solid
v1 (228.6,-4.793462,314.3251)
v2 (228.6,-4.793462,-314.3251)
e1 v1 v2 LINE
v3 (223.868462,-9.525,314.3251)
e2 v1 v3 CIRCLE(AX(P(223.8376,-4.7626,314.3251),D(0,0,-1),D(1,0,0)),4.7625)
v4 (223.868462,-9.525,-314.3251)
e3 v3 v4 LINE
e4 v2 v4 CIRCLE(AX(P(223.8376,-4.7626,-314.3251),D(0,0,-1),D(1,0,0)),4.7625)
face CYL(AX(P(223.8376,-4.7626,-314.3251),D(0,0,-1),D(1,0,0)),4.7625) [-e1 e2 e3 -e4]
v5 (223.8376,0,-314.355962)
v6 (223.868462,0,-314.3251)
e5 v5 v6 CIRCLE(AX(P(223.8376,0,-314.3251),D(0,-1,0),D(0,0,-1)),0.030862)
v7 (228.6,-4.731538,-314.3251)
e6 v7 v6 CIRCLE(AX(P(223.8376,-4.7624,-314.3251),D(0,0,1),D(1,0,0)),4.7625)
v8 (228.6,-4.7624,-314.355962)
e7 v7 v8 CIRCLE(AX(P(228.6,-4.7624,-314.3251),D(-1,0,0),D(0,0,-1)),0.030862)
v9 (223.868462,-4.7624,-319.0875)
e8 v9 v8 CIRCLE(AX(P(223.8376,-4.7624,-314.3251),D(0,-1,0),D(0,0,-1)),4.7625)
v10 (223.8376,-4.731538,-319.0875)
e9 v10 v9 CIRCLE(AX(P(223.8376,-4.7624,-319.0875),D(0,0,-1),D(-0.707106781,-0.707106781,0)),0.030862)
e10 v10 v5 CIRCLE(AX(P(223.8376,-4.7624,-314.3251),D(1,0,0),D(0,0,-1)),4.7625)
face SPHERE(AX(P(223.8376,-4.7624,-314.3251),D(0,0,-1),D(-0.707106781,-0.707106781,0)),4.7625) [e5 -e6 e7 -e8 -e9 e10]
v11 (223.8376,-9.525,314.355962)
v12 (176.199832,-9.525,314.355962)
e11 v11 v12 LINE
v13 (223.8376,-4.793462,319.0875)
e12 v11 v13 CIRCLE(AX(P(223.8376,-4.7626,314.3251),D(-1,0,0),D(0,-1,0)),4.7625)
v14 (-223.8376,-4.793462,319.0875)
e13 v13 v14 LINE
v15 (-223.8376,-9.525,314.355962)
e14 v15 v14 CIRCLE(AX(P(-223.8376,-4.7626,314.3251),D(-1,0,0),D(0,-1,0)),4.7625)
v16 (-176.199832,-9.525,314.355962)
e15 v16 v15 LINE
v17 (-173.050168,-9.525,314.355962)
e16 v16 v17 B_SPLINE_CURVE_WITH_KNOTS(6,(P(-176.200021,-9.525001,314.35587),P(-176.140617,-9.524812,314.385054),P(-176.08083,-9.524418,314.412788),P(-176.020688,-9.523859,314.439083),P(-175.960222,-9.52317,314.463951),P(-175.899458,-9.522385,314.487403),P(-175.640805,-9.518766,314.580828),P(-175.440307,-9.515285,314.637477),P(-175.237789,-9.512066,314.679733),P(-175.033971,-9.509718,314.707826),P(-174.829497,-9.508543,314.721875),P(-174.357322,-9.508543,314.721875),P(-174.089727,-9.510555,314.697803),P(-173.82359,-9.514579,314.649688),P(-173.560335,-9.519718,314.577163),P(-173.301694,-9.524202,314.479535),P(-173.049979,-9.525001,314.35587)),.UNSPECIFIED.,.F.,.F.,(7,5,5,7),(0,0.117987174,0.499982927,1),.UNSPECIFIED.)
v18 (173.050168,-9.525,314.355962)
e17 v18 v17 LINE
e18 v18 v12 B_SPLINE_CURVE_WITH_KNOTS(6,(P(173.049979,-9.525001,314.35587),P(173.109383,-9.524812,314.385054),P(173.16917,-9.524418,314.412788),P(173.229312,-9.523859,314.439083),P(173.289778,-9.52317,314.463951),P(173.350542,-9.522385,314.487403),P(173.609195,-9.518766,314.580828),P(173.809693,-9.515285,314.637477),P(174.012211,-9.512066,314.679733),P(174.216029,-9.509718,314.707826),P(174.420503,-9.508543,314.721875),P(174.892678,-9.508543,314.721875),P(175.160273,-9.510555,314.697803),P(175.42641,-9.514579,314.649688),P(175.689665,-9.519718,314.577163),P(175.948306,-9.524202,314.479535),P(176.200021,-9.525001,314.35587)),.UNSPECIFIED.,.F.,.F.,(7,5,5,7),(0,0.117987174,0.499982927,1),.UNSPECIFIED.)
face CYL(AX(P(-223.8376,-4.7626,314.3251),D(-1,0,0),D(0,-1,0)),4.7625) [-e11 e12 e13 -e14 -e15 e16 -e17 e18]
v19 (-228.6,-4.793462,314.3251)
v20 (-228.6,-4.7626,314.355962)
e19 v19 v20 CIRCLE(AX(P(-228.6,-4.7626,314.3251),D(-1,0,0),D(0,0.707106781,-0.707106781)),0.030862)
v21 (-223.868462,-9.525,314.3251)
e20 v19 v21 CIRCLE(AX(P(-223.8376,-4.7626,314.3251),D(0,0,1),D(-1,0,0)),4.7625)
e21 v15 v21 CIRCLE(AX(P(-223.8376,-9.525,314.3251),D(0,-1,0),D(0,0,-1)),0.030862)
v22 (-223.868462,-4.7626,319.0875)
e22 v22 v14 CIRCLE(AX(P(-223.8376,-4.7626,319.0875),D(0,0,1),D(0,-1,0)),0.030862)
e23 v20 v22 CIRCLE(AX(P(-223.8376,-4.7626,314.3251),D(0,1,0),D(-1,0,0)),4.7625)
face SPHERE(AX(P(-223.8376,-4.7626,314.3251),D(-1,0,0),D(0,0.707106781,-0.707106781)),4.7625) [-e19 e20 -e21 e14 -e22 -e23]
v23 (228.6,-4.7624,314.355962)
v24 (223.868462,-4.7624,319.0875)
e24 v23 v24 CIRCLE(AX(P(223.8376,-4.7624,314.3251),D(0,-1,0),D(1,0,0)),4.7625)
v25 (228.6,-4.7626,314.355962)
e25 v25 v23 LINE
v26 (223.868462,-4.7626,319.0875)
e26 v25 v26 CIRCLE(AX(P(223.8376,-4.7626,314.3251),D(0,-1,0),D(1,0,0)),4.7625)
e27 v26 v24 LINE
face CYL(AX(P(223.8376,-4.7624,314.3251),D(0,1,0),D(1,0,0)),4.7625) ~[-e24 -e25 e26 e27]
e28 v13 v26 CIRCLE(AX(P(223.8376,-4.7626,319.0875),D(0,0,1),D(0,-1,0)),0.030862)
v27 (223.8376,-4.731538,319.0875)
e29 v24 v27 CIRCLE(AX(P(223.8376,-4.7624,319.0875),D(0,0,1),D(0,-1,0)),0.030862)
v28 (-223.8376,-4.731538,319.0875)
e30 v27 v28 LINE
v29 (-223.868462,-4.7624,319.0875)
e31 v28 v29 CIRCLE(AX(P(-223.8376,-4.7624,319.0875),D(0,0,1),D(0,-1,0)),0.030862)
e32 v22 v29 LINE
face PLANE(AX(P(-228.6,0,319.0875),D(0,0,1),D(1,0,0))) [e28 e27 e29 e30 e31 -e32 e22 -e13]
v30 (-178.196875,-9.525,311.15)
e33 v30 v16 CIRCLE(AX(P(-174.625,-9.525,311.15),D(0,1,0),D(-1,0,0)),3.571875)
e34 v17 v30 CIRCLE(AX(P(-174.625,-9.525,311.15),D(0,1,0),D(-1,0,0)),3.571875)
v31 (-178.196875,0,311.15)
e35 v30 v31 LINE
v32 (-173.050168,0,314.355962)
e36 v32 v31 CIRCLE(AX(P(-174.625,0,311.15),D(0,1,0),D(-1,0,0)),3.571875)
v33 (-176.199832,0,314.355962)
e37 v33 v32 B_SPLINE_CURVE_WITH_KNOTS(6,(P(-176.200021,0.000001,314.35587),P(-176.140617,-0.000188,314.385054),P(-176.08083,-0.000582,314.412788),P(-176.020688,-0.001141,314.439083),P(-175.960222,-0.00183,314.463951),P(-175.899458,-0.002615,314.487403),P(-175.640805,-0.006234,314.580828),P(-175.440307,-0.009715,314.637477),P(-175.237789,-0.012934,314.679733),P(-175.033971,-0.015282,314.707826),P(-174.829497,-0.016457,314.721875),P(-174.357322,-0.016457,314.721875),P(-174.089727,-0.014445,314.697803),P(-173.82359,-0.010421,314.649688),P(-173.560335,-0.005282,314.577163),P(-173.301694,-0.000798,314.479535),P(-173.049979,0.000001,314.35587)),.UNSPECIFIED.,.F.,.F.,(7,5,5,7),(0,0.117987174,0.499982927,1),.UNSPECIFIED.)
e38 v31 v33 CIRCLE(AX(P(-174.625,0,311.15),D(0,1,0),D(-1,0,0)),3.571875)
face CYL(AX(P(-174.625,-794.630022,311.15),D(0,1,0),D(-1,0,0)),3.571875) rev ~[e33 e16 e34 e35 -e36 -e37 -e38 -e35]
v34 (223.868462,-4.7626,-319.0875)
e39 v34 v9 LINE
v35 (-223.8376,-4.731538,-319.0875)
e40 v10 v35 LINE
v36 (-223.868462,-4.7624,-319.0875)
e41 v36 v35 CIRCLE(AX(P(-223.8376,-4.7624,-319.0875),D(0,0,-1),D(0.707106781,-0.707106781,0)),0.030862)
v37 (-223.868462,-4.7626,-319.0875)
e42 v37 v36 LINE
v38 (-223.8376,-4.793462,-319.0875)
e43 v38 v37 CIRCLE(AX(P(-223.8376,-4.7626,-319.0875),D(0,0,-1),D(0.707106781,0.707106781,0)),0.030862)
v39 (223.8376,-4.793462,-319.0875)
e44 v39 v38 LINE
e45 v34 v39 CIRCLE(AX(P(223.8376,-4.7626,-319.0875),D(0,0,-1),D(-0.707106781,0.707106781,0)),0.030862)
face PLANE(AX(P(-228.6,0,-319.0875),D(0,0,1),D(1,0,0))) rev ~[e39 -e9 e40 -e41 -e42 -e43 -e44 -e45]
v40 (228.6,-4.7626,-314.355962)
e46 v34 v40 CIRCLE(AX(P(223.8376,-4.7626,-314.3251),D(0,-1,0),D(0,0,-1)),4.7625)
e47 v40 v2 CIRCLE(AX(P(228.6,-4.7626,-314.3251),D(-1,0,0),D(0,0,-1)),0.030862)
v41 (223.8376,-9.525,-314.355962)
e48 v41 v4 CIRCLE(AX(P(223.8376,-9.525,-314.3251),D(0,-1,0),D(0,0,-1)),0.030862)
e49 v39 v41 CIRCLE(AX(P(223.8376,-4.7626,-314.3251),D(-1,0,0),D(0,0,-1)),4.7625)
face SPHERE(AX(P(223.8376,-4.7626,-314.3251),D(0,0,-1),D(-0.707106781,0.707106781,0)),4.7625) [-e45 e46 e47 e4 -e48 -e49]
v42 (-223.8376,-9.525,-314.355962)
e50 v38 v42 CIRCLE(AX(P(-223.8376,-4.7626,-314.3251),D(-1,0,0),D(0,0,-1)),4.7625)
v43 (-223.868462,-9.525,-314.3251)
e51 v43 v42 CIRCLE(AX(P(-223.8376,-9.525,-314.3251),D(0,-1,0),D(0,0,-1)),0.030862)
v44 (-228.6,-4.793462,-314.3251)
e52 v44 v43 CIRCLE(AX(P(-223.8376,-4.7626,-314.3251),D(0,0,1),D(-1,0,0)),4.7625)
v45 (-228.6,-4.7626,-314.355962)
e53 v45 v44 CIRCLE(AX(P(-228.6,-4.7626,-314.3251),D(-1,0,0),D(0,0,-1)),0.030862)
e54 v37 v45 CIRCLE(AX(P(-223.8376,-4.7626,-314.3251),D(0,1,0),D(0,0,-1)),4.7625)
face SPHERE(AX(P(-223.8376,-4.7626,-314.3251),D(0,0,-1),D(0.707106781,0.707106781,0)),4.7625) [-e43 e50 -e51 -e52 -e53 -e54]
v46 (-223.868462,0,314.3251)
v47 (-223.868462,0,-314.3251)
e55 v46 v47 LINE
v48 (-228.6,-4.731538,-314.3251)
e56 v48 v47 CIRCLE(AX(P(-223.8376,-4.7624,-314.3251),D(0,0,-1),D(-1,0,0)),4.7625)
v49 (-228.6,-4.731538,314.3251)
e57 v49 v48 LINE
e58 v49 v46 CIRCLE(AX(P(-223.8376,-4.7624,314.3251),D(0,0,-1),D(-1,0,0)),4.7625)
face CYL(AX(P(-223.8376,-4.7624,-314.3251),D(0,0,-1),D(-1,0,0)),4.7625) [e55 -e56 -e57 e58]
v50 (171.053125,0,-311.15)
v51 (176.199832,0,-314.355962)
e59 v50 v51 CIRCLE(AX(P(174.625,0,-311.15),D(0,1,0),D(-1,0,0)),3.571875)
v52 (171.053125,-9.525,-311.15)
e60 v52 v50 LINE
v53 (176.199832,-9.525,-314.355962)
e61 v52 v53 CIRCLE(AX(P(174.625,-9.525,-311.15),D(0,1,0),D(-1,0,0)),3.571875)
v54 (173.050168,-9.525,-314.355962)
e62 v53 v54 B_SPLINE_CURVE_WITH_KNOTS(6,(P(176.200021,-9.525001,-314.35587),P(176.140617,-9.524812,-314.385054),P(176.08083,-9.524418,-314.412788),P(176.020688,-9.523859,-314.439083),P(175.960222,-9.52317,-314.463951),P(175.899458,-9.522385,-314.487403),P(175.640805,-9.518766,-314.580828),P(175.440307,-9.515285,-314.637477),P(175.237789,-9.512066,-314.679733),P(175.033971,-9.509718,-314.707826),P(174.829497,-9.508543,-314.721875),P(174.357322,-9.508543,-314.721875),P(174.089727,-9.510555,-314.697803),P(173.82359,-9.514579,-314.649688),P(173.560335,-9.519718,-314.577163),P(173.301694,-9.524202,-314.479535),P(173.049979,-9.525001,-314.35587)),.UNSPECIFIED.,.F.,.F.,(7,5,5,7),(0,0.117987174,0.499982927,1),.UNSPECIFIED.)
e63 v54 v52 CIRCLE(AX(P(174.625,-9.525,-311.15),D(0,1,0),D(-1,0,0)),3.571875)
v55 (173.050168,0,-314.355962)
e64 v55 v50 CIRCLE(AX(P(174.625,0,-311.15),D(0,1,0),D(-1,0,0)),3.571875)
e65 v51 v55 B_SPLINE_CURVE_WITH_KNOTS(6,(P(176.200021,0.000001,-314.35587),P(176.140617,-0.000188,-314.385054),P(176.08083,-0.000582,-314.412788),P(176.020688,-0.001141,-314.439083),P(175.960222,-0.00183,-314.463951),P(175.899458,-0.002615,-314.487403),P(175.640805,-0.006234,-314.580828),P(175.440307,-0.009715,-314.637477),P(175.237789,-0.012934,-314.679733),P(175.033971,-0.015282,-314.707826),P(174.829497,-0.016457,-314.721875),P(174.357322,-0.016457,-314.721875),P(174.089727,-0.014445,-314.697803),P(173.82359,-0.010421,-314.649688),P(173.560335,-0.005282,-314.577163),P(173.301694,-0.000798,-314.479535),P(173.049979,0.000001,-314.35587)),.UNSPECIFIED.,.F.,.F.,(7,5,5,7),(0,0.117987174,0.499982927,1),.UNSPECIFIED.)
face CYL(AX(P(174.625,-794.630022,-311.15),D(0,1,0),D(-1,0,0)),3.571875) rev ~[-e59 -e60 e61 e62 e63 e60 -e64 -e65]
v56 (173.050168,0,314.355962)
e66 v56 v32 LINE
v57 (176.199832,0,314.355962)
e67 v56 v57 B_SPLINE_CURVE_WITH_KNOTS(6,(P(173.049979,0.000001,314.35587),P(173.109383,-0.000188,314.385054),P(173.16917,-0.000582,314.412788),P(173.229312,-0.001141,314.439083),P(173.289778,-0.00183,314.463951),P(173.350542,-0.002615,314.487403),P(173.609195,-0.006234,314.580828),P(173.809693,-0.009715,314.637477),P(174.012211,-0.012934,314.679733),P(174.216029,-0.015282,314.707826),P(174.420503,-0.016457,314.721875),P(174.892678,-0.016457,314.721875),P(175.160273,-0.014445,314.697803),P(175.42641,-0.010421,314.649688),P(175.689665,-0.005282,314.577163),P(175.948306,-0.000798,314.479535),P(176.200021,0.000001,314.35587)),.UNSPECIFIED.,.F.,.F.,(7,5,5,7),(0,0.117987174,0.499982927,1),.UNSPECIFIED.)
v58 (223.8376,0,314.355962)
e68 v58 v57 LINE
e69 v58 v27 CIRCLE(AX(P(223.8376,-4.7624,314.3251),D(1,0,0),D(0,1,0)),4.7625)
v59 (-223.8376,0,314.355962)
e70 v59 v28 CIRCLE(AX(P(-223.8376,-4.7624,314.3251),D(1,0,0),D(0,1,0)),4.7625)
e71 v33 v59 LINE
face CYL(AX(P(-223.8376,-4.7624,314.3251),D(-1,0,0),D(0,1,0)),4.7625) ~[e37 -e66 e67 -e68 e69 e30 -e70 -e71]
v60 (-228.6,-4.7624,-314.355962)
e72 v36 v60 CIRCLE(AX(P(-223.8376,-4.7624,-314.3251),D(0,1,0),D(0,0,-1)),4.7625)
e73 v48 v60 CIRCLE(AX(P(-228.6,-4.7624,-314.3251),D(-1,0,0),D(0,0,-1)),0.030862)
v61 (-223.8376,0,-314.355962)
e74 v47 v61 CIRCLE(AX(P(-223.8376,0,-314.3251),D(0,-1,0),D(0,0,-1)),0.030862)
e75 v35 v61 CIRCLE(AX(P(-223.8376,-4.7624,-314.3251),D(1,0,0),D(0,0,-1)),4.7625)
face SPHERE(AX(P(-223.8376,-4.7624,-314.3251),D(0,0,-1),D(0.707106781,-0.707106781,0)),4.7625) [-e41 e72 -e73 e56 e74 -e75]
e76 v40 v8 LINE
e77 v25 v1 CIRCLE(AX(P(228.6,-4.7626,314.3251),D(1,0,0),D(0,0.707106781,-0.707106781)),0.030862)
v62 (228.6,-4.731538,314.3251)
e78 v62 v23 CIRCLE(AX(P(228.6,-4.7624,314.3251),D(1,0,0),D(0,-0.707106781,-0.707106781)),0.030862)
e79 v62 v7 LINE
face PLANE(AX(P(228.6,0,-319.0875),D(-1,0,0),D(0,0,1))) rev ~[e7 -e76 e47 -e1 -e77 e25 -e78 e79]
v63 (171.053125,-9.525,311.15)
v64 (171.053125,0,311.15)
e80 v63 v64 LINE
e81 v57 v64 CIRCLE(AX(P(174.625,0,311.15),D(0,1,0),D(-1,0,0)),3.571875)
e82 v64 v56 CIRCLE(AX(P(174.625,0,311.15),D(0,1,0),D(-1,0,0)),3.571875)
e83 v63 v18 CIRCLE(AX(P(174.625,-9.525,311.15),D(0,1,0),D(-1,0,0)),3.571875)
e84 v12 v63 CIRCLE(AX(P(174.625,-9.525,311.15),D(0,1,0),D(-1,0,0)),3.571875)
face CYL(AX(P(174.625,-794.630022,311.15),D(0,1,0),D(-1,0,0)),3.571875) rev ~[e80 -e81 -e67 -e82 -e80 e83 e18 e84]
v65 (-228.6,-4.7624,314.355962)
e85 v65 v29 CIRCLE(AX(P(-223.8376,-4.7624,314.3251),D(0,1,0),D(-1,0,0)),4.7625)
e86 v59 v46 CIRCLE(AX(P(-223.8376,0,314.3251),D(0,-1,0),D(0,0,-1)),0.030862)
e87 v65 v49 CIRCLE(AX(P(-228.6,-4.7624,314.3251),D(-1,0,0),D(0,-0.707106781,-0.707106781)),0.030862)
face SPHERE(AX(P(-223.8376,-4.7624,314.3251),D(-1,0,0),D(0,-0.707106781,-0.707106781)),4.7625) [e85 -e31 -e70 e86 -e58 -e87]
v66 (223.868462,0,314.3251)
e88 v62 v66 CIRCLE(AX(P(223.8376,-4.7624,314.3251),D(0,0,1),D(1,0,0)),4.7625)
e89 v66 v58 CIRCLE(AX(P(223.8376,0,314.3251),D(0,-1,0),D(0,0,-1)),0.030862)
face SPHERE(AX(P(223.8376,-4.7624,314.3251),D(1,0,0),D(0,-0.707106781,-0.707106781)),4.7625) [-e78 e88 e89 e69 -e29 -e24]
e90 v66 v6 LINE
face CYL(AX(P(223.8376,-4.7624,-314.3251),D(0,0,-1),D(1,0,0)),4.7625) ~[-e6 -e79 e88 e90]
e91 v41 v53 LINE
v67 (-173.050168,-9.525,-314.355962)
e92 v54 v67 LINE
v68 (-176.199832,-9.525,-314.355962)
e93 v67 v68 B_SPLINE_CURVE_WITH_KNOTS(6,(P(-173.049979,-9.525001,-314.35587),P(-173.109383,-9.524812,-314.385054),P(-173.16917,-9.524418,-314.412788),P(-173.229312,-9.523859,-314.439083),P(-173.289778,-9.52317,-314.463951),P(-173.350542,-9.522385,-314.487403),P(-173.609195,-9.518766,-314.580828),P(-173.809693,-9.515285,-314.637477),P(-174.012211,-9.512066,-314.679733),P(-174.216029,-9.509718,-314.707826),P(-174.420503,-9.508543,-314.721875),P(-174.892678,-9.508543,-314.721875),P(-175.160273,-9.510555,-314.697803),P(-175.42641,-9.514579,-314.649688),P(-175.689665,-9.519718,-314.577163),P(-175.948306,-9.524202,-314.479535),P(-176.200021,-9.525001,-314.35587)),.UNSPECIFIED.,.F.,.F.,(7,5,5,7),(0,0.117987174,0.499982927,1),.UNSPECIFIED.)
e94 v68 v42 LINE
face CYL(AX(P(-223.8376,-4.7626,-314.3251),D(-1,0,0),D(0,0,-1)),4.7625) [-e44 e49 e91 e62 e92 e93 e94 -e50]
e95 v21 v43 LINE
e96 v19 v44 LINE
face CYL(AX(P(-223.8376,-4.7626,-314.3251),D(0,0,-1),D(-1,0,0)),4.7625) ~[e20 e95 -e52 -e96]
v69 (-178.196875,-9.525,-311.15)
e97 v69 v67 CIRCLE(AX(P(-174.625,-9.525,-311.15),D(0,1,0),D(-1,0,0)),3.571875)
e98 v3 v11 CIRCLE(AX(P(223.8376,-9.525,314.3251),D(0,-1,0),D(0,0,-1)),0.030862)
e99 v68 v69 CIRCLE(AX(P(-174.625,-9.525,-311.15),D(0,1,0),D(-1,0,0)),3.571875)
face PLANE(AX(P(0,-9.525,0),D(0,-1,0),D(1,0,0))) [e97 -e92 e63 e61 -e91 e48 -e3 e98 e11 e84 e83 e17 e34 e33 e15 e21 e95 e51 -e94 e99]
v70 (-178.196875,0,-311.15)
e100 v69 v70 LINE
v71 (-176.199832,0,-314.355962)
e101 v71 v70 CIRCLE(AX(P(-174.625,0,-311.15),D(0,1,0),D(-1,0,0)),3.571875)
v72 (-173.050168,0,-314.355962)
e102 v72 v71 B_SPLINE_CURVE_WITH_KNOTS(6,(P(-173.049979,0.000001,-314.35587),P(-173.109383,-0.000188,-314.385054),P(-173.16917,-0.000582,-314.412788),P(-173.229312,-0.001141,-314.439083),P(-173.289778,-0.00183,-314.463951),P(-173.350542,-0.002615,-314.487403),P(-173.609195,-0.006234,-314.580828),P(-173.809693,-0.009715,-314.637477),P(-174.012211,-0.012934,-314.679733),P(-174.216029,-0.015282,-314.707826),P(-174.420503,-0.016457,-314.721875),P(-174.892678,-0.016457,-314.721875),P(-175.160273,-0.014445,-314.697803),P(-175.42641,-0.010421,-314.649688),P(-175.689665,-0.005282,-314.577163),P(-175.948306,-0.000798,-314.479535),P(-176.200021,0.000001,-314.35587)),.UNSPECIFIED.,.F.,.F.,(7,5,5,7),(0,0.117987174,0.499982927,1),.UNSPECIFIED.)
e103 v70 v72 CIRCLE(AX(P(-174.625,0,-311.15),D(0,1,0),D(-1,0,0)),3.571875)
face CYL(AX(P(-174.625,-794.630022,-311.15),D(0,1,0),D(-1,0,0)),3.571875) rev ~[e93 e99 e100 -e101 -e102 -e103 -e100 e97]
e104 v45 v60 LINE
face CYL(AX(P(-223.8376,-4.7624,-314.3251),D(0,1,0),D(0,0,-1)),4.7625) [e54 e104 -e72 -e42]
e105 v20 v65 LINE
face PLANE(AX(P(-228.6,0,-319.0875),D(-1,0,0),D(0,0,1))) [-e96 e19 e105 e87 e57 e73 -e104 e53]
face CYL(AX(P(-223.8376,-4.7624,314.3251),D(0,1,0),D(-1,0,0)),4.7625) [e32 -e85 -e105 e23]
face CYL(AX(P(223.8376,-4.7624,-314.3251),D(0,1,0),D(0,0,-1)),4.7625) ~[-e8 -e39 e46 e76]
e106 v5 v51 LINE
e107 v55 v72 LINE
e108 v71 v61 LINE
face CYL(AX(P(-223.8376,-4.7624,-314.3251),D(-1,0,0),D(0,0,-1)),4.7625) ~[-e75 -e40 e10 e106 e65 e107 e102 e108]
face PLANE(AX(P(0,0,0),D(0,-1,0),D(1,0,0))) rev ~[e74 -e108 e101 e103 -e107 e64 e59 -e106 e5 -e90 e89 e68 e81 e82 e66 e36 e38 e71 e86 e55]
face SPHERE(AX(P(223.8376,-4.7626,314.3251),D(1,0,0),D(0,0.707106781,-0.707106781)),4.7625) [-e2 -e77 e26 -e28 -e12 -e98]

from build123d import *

# Parameters (mm, degrees)
F0_W         = 457.2
F0_H         = 638.175
F1_DEPTH     = 9.525
F3_D         = 7.14375
F4_T1_DEPTH  = 628.6502
F4_T3_DEPTH  = 447.6752
F4_T5_DEPTH  = 0.0002
F4_S9_W      = 4.85775
F4_S9_H      = 4.85775
F4_T10_DEPTH = 4.85775
F4_S15_W     = 4.85775
F4_S15_H     = 4.85775
F4_T16_DEPTH = 4.85775
F4_S21_W     = 4.85775
F4_S21_H     = 4.85775
F4_T22_DEPTH = 4.85775
F4_S27_W     = 4.85775
F4_S27_H     = 4.85775
F4_T28_DEPTH = 4.85775
F4_S33_W     = 4.85775
F4_S33_H     = 4.85775
F4_T34_DEPTH = 4.85775
F4_S39_W     = 4.85775
F4_S39_H     = 4.85775
F4_T40_DEPTH = 4.85775
F4_S45_W     = 4.85775
F4_S45_H     = 4.85775
F4_T46_DEPTH = 4.85775
F4_S51_W     = 4.85775
F4_S51_H     = 4.85775
F4_T52_DEPTH = 4.85775


# Not quite as in the source:
# - a fillet or chamfer that OpenCascade refuses, or shapes differently, is made with other operations: its cross-section is extruded or revolved along the edge and cut away or added


with BuildPart() as f1:
    # F0 (on Front) → F1 (new body)
    with BuildSketch(Plane.XZ):
        Rectangle(F0_W, F0_H)
    extrude(amount=F1_DEPTH)

    # F3 (through all)
    with Locations(Plane.XZ.offset(9.525)):
        with Locations((-174.625, 311.15), (174.625, 311.15), (-174.625, -311.15), (174.625, -311.15)):
            Hole(F3_D / 2)

    # F4: fillet of radius 4.7625 on 12 edges, made by hand

    # F4_s2 → F4_t1 (cut)
    with BuildSketch(Plane.XY.offset(-314.3251)):
        with BuildLine():
            ThreePointArc((-228.6001, -4.7626), (-227.2051960454, -8.1301960454), (-223.8376, -9.5251))
            Line((-223.8376, -9.5251), (-223.8376, -9.62035))
            ThreePointArc((-223.8376, -9.62035), (-226.2188, -9.62025), (-228.6, -9.62025))
            Line((-228.6, -9.62025), (-228.69525, -9.525))
            ThreePointArc((-228.69525, -9.525), (-228.69525, -7.1438), (-228.69535, -4.7626))
            Line((-228.69535, -4.7626), (-228.6001, -4.7626))
        make_face()
        with BuildLine():
            ThreePointArc((228.6001, -4.7626), (227.2051960454, -8.1301960454), (223.8376, -9.5251))
            Line((223.8376, -9.5251), (223.8376, -9.62035))
            ThreePointArc((223.8376, -9.62035), (226.2188, -9.62025), (228.6, -9.62025))
            Line((228.6, -9.62025), (228.69525, -9.525))
            ThreePointArc((228.69525, -9.525), (228.69525, -7.1438), (228.69535, -4.7626))
            Line((228.69535, -4.7626), (228.6001, -4.7626))
        make_face()
        with BuildLine():
            ThreePointArc((228.6001, -4.7624), (227.2051960454, -1.3948039546), (223.8376, 0.0001))
            Line((223.8376, 0.0001), (223.8376, 0.09535))
            ThreePointArc((223.8376, 0.09535), (226.2188, 0.09525), (228.6, 0.09525))
            Line((228.6, 0.09525), (228.69525, 0))
            ThreePointArc((228.69525, 0), (228.69525, -2.3812), (228.69535, -4.7624))
            Line((228.69535, -4.7624), (228.6001, -4.7624))
        make_face()
        with BuildLine():
            ThreePointArc((-228.6001, -4.7624), (-227.2051960454, -1.3948039546), (-223.8376, 0.0001))
            Line((-223.8376, 0.0001), (-223.8376, 0.09535))
            ThreePointArc((-223.8376, 0.09535), (-226.2188, 0.09525), (-228.6, 0.09525))
            Line((-228.6, 0.09525), (-228.69525, 0))
            ThreePointArc((-228.69525, 0), (-228.69525, -2.3812), (-228.69535, -4.7624))
            Line((-228.69535, -4.7624), (-228.6001, -4.7624))
        make_face()
    extrude(amount=F4_T1_DEPTH, mode=Mode.SUBTRACT)

    # F4_s4 → F4_t3 (cut)
    with BuildSketch(Plane.YZ.offset(-223.8376)):
        with BuildLine():
            ThreePointArc((-4.7626, -319.0876), (-8.1301960454, -317.6926960454), (-9.5251, -314.3251))
            Line((-9.5251, -314.3251), (-9.62035, -314.3251))
            ThreePointArc((-9.62035, -314.3251), (-9.62025, -316.7063), (-9.62025, -319.0875))
            Line((-9.62025, -319.0875), (-9.525, -319.18275))
            ThreePointArc((-9.525, -319.18275), (-7.1438, -319.18275), (-4.7626, -319.18285))
            Line((-4.7626, -319.18285), (-4.7626, -319.0876))
        make_face()
        with BuildLine():
            ThreePointArc((-9.5251, 314.3251), (-8.1301960454, 317.6926960454), (-4.7626, 319.0876))
            Line((-4.7626, 319.0876), (-4.7626, 319.18285))
            ThreePointArc((-4.7626, 319.18285), (-7.1438, 319.18275), (-9.525, 319.18275))
            Line((-9.525, 319.18275), (-9.62025, 319.0875))
            ThreePointArc((-9.62025, 319.0875), (-9.62025, 316.7063), (-9.62035, 314.3251))
            Line((-9.62035, 314.3251), (-9.5251, 314.3251))
        make_face()
        with BuildLine():
            ThreePointArc((0.0001, 314.3251), (-1.3948039546, 317.6926960454), (-4.7624, 319.0876))
            Line((-4.7624, 319.0876), (-4.7624, 319.18285))
            ThreePointArc((-4.7624, 319.18285), (-2.3812, 319.18275), (0, 319.18275))
            Line((0, 319.18275), (0.09525, 319.0875))
            ThreePointArc((0.09525, 319.0875), (0.09525, 316.7063), (0.09535, 314.3251))
            Line((0.09535, 314.3251), (0.0001, 314.3251))
        make_face()
        with BuildLine():
            ThreePointArc((-4.7624, -319.0876), (-1.3948039546, -317.6926960454), (0.0001, -314.3251))
            Line((0.0001, -314.3251), (0.09535, -314.3251))
            ThreePointArc((0.09535, -314.3251), (0.09525, -316.7063), (0.09525, -319.0875))
            Line((0.09525, -319.0875), (0, -319.18275))
            ThreePointArc((0, -319.18275), (-2.3812, -319.18275), (-4.7624, -319.18285))
            Line((-4.7624, -319.18285), (-4.7624, -319.0876))
        make_face()
    extrude(amount=F4_T3_DEPTH, mode=Mode.SUBTRACT)

    # F4_s6 → F4_t5 (cut)
    with BuildSketch(Plane.XZ.offset(4.7624)):
        with BuildLine():
            ThreePointArc((-223.8376, -319.0876), (-227.2051960454, -317.6926960454), (-228.6001, -314.3251))
            Line((-228.6001, -314.3251), (-228.69535, -314.3251))
            ThreePointArc((-228.69535, -314.3251), (-228.69525, -316.7063), (-228.69525, -319.0875))
            Line((-228.69525, -319.0875), (-228.6, -319.18275))
            ThreePointArc((-228.6, -319.18275), (-226.2188, -319.18275), (-223.8376, -319.18285))
            Line((-223.8376, -319.18285), (-223.8376, -319.0876))
        make_face()
        with BuildLine():
            ThreePointArc((223.8376, -319.0876), (227.2051960454, -317.6926960454), (228.6001, -314.3251))
            Line((228.6001, -314.3251), (228.69535, -314.3251))
            ThreePointArc((228.69535, -314.3251), (228.69525, -316.7063), (228.69525, -319.0875))
            Line((228.69525, -319.0875), (228.6, -319.18275))
            ThreePointArc((228.6, -319.18275), (226.2188, -319.18275), (223.8376, -319.18285))
            Line((223.8376, -319.18285), (223.8376, -319.0876))
        make_face()
        with BuildLine():
            ThreePointArc((228.6001, 314.3251), (227.2051960454, 317.6926960454), (223.8376, 319.0876))
            Line((223.8376, 319.0876), (223.8376, 319.18285))
            ThreePointArc((223.8376, 319.18285), (226.2188, 319.18275), (228.6, 319.18275))
            Line((228.6, 319.18275), (228.69525, 319.0875))
            ThreePointArc((228.69525, 319.0875), (228.69525, 316.7063), (228.69535, 314.3251))
            Line((228.69535, 314.3251), (228.6001, 314.3251))
        make_face()
        with BuildLine():
            ThreePointArc((-228.6001, 314.3251), (-227.2051960454, 317.6926960454), (-223.8376, 319.0876))
            Line((-223.8376, 319.0876), (-223.8376, 319.18285))
            ThreePointArc((-223.8376, 319.18285), (-226.2188, 319.18275), (-228.6, 319.18275))
            Line((-228.6, 319.18275), (-228.69525, 319.0875))
            ThreePointArc((-228.69525, 319.0875), (-228.69525, 316.7063), (-228.69535, 314.3251))
            Line((-228.69535, 314.3251), (-228.6001, 314.3251))
        make_face()
    extrude(amount=F4_T5_DEPTH, mode=Mode.SUBTRACT)


with BuildPart() as f4_tool8:
    # F4_s9 → F4_t10 (new body)
    with BuildSketch(Plane.YZ.offset(-223.8376)):
        with Locations((-7.191475, 316.753975)):
            Rectangle(F4_S9_W, F4_S9_H)
    extrude(amount=-F4_T10_DEPTH)

    # F4_s11 → F4_t12 (revolve, cut)
    with BuildSketch(Plane(origin=(-223.8376, -4.7626, 314.3251), x_dir=(0, 0.7071067812, -0.7071067812), z_dir=(0, 0.7071067812, 0.7071067812))):
        with BuildLine():
            ThreePointArc((0, -4.7625), (4.7625, 0), (0, 4.7625))
            Line((0, 4.7625), (0, -4.7625))
        make_face()
    revolve(axis=Axis((-223.8376, -4.7626, 314.3251), (-1, 0, 0)), mode=Mode.SUBTRACT)


with BuildPart() as f1_1:
    add(f1.part)

    # F4_t7: cut F4_tool8
    add(f4_tool8.part, mode=Mode.SUBTRACT)


with BuildPart() as f4_tool14:
    # F4_s15 → F4_t16 (new body)
    with BuildSketch(Plane.XY.offset(-314.3251)):
        with Locations((-226.266475, -7.191475)):
            Rectangle(F4_S15_W, F4_S15_H)
    extrude(amount=-F4_T16_DEPTH)

    # F4_s17 → F4_t18 (revolve, cut)
    with BuildSketch(Plane(origin=(-223.8376, -4.7626, -314.3251), x_dir=(0.7071067812, 0.7071067812, 0), z_dir=(-0.7071067812, 0.7071067812, 0))):
        with BuildLine():
            ThreePointArc((0, -4.7625), (4.7625, 0), (0, 4.7625))
            Line((0, 4.7625), (0, -4.7625))
        make_face()
    revolve(axis=Axis((-223.8376, -4.7626, -314.3251), (0, 0, -1)), mode=Mode.SUBTRACT)


with BuildPart() as f1_2:
    add(f1_1.part)

    # F4_t13: cut F4_tool14
    add(f4_tool14.part, mode=Mode.SUBTRACT)


with BuildPart() as f4_tool20:
    # F4_s21 → F4_t22 (new body)
    with BuildSketch(Plane.XY.offset(-314.3251)):
        with Locations((226.266475, -7.191475)):
            Rectangle(F4_S21_W, F4_S21_H)
    extrude(amount=-F4_T22_DEPTH)

    # F4_s23 → F4_t24 (revolve, cut)
    with BuildSketch(Plane(origin=(223.8376, -4.7626, -314.3251), x_dir=(-0.7071067812, 0.7071067812, 0), z_dir=(-0.7071067812, -0.7071067812, 0))):
        with BuildLine():
            ThreePointArc((0, -4.7625), (4.7625, 0), (0, 4.7625))
            Line((0, 4.7625), (0, -4.7625))
        make_face()
    revolve(axis=Axis((223.8376, -4.7626, -314.3251), (0, 0, -1)), mode=Mode.SUBTRACT)


with BuildPart() as f1_3:
    add(f1_2.part)

    # F4_t19: cut F4_tool20
    add(f4_tool20.part, mode=Mode.SUBTRACT)


with BuildPart() as f4_tool26:
    # F4_s27 → F4_t28 (new body)
    with BuildSketch(Plane.YZ.offset(223.8376)):
        with Locations((-7.191475, 316.753975)):
            Rectangle(F4_S27_W, F4_S27_H)
    extrude(amount=F4_T28_DEPTH)

    # F4_s29 → F4_t30 (revolve, cut)
    with BuildSketch(Plane(origin=(223.8376, -4.7626, 314.3251), x_dir=(0, 0.7071067812, -0.7071067812), z_dir=(0, -0.7071067812, -0.7071067812))):
        with BuildLine():
            ThreePointArc((0, -4.7625), (4.7625, 0), (0, 4.7625))
            Line((0, 4.7625), (0, -4.7625))
        make_face()
    revolve(axis=Axis((223.8376, -4.7626, 314.3251), (1, 0, 0)), mode=Mode.SUBTRACT)


with BuildPart() as f1_4:
    add(f1_3.part)

    # F4_t25: cut F4_tool26
    add(f4_tool26.part, mode=Mode.SUBTRACT)


with BuildPart() as f4_tool32:
    # F4_s33 → F4_t34 (new body)
    with BuildSketch(Plane.XY.offset(-314.3251)):
        with Locations((226.266475, -2.333525)):
            Rectangle(F4_S33_W, F4_S33_H)
    extrude(amount=-F4_T34_DEPTH)

    # F4_s35 → F4_t36 (revolve, cut)
    with BuildSketch(Plane(origin=(223.8376, -4.7624, -314.3251), x_dir=(-0.7071067812, -0.7071067812, 0), z_dir=(0.7071067812, -0.7071067812, 0))):
        with BuildLine():
            ThreePointArc((0, -4.7625), (4.7625, 0), (0, 4.7625))
            Line((0, 4.7625), (0, -4.7625))
        make_face()
    revolve(axis=Axis((223.8376, -4.7624, -314.3251), (0, 0, -1)), mode=Mode.SUBTRACT)


with BuildPart() as f1_5:
    add(f1_4.part)

    # F4_t31: cut F4_tool32
    add(f4_tool32.part, mode=Mode.SUBTRACT)


with BuildPart() as f4_tool38:
    # F4_s39 → F4_t40 (new body)
    with BuildSketch(Plane.YZ.offset(223.8376)):
        with Locations((-2.333525, 316.753975)):
            Rectangle(F4_S39_W, F4_S39_H)
    extrude(amount=F4_T40_DEPTH)

    # F4_s41 → F4_t42 (revolve, cut)
    with BuildSketch(Plane(origin=(223.8376, -4.7624, 314.3251), x_dir=(0, -0.7071067812, -0.7071067812), z_dir=(0, -0.7071067812, 0.7071067812))):
        with BuildLine():
            ThreePointArc((0, -4.7625), (4.7625, 0), (0, 4.7625))
            Line((0, 4.7625), (0, -4.7625))
        make_face()
    revolve(axis=Axis((223.8376, -4.7624, 314.3251), (1, 0, 0)), mode=Mode.SUBTRACT)


with BuildPart() as f1_6:
    add(f1_5.part)

    # F4_t37: cut F4_tool38
    add(f4_tool38.part, mode=Mode.SUBTRACT)


with BuildPart() as f4_tool44:
    # F4_s45 → F4_t46 (new body)
    with BuildSketch(Plane.YZ.offset(-223.8376)):
        with Locations((-2.333525, 316.753975)):
            Rectangle(F4_S45_W, F4_S45_H)
    extrude(amount=-F4_T46_DEPTH)

    # F4_s47 → F4_t48 (revolve, cut)
    with BuildSketch(Plane(origin=(-223.8376, -4.7624, 314.3251), x_dir=(0, -0.7071067812, -0.7071067812), z_dir=(0, 0.7071067812, -0.7071067812))):
        with BuildLine():
            ThreePointArc((0, -4.7625), (4.7625, 0), (0, 4.7625))
            Line((0, 4.7625), (0, -4.7625))
        make_face()
    revolve(axis=Axis((-223.8376, -4.7624, 314.3251), (-1, 0, 0)), mode=Mode.SUBTRACT)


with BuildPart() as f1_7:
    add(f1_6.part)

    # F4_t43: cut F4_tool44
    add(f4_tool44.part, mode=Mode.SUBTRACT)


with BuildPart() as f4_tool50:
    # F4_s51 → F4_t52 (new body)
    with BuildSketch(Plane.XY.offset(-314.3251)):
        with Locations((-226.266475, -2.333525)):
            Rectangle(F4_S51_W, F4_S51_H)
    extrude(amount=-F4_T52_DEPTH)

    # F4_s53 → F4_t54 (revolve, cut)
    with BuildSketch(Plane(origin=(-223.8376, -4.7624, -314.3251), x_dir=(0.7071067812, -0.7071067812, 0), z_dir=(0.7071067812, 0.7071067812, 0))):
        with BuildLine():
            ThreePointArc((0, -4.7625), (4.7625, 0), (0, 4.7625))
            Line((0, 4.7625), (0, -4.7625))
        make_face()
    revolve(axis=Axis((-223.8376, -4.7624, -314.3251), (0, 0, -1)), mode=Mode.SUBTRACT)


with BuildPart() as f1_8:
    add(f1_7.part)

    # F4_t49: cut F4_tool50
    add(f4_tool50.part, mode=Mode.SUBTRACT)


solid = f1_8.part
